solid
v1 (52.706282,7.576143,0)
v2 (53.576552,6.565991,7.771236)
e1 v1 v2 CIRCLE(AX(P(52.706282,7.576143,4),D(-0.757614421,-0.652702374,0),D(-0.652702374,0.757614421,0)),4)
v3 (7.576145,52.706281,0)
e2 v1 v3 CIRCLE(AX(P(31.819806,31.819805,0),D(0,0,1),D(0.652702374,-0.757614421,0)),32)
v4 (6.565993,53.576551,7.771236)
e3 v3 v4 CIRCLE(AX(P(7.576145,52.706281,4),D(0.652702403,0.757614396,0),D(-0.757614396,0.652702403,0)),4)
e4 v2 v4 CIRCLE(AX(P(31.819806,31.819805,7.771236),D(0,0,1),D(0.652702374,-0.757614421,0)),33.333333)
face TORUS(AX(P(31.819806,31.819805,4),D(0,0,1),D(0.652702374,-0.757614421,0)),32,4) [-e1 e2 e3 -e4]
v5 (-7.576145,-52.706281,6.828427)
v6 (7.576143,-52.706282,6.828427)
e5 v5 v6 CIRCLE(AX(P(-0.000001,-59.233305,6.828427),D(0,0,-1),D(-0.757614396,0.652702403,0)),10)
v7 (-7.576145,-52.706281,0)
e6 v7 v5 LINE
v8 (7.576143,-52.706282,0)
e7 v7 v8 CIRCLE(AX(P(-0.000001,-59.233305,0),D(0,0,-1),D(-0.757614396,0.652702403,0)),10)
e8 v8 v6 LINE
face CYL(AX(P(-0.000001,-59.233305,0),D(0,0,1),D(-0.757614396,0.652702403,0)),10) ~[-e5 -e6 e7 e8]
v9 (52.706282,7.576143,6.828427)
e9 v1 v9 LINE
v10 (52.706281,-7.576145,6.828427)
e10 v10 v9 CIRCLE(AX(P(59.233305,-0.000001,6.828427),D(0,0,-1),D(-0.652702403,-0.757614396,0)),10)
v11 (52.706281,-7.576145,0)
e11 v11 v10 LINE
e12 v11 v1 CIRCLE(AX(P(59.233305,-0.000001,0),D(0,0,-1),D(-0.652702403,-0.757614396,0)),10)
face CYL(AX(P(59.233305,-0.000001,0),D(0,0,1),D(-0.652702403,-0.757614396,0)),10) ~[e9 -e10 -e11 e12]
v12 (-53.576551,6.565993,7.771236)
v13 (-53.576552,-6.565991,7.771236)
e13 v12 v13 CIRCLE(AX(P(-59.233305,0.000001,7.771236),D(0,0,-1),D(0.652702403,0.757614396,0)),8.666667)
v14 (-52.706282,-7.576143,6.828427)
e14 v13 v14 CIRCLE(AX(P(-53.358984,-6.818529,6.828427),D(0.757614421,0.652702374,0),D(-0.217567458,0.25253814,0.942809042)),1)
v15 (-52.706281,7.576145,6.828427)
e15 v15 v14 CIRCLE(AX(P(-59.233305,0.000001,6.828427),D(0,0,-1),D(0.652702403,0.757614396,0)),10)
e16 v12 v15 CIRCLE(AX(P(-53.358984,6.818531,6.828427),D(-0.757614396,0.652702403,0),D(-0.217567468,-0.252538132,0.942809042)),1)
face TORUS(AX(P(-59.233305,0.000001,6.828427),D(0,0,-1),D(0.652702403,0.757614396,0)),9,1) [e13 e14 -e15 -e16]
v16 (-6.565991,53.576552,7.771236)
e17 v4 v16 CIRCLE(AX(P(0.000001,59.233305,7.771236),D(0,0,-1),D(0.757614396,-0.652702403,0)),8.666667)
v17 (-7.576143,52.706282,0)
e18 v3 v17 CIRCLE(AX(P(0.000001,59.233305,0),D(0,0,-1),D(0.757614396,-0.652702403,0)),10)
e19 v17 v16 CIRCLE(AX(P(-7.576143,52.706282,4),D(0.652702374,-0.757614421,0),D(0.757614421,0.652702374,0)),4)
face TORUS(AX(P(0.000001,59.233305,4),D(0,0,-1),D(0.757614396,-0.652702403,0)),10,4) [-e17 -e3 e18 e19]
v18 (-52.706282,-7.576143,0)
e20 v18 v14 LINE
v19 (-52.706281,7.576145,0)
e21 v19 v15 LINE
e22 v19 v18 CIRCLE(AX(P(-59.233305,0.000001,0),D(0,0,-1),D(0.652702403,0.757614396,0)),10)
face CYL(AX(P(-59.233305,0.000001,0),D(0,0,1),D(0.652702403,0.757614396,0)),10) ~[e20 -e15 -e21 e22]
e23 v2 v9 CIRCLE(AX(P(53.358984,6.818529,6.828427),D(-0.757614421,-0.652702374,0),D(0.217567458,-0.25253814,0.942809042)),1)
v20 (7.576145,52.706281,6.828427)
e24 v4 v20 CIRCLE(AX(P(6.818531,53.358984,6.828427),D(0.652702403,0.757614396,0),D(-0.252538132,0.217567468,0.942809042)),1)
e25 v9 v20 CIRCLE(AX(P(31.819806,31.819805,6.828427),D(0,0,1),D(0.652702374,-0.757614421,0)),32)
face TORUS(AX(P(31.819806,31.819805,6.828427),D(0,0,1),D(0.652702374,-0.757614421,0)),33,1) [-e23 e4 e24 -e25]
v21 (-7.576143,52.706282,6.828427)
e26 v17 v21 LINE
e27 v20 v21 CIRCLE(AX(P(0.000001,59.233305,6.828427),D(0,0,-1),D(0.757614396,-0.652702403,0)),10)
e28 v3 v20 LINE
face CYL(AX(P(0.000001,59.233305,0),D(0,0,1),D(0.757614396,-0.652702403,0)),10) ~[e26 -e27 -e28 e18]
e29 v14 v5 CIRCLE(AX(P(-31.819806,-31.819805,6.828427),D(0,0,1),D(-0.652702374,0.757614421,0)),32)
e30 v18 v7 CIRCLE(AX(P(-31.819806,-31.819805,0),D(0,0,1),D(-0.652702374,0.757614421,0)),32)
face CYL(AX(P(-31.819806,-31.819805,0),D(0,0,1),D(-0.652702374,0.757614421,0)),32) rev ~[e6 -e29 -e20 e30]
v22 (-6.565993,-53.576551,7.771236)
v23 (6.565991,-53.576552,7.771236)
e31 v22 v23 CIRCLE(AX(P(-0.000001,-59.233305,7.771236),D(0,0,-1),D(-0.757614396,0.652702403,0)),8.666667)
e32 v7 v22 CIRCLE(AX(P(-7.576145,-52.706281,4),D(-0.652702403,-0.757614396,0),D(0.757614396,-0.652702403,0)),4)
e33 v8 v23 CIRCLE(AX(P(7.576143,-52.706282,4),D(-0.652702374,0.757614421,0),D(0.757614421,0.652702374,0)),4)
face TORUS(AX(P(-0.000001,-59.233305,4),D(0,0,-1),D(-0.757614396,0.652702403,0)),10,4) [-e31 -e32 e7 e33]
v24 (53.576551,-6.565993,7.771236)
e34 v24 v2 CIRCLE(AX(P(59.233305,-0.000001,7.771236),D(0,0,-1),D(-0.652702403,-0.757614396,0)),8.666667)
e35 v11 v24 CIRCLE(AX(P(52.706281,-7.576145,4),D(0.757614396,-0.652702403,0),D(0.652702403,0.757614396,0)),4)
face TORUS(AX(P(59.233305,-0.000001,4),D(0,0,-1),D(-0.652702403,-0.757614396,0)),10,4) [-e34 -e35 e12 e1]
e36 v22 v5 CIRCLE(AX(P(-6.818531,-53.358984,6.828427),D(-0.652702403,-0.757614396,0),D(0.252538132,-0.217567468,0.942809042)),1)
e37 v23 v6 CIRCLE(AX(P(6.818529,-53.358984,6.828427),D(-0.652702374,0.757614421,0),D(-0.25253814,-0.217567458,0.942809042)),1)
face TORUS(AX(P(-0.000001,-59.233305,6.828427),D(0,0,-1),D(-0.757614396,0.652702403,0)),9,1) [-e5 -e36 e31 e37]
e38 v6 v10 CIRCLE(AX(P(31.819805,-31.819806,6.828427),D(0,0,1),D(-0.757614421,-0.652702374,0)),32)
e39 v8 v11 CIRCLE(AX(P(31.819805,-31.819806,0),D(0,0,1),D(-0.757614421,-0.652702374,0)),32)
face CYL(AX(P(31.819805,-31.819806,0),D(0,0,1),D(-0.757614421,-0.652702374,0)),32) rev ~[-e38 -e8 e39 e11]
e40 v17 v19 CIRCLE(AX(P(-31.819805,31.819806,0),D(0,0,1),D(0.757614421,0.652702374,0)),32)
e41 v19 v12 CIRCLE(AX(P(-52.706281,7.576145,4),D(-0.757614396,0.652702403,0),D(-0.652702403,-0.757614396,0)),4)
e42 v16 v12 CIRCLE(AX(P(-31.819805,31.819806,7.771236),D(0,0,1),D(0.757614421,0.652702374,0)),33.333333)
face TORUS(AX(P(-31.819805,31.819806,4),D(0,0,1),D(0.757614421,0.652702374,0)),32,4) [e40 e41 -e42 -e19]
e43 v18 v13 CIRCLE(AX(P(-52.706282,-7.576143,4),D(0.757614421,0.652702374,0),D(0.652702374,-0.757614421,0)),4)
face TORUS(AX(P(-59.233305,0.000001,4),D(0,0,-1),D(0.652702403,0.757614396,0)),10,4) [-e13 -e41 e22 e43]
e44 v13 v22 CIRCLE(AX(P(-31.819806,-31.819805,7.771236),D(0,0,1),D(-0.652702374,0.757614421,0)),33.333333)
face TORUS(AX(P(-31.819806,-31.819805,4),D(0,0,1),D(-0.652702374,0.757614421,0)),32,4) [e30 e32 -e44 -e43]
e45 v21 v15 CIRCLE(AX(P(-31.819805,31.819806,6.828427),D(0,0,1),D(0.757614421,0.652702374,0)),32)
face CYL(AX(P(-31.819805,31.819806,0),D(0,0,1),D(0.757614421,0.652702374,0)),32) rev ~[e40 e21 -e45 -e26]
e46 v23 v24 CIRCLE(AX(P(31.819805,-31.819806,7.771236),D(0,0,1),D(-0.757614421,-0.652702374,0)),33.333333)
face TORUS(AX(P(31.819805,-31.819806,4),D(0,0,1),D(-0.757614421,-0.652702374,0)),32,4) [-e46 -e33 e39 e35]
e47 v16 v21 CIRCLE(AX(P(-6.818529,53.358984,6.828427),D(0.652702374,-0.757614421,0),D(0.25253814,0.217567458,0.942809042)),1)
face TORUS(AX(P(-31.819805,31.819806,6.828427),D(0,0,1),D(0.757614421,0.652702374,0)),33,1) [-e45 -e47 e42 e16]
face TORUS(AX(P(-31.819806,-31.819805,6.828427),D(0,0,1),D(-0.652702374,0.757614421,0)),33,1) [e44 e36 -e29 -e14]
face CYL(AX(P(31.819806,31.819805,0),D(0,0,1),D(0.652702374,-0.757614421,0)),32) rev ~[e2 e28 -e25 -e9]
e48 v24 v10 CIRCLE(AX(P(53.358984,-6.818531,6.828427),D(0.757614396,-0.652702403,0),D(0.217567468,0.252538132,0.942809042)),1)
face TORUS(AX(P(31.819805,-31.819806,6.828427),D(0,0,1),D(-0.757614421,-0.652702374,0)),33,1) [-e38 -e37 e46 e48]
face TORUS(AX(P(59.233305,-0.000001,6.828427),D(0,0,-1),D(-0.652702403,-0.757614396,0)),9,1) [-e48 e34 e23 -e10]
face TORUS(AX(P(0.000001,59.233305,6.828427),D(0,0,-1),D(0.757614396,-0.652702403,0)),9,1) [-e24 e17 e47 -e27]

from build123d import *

# Parameters (mm, degrees)
F3_T3_ANGLE  = 98.5086767383
F3_T6_ANGLE  = 188.5086767383
F3_T9_ANGLE  = 98.5086767383
F3_T12_ANGLE = 188.5086767383
F3_T15_ANGLE = 98.5086767383
F3_T18_ANGLE = 188.5086767383
F3_T21_ANGLE = 98.5086767383
F3_T24_ANGLE = 188.5086767383


# Not quite as in the source:
# - a fillet or chamfer that OpenCascade refuses, or shapes differently, is made with other operations: its cross-section is extruded or revolved along the edge and cut away or added


with BuildPart() as f2:
    # F2: sweep along a path in F0
    with BuildLine(Plane.XY) as f2_path:
        ThreePointArc((-7.5761430926, 52.7062817331), (-54.4472211271, 54.4472231756), (-52.706281448, 7.5761450757))
        ThreePointArc((-52.706281448, 7.5761450757), (-49.2333054771, 9.262e-07), (-52.7062817331, -7.5761430926))
        ThreePointArc((-52.7062817331, -7.5761430926), (-54.4472231756, -54.4472211271), (-7.5761450757, -52.706281448))
        ThreePointArc((-7.5761450757, -52.706281448), (-9.262e-07, -49.2333054771), (7.5761430926, -52.7062817331))
        ThreePointArc((7.5761430926, -52.7062817331), (54.4472211271, -54.4472231756), (52.706281448, -7.5761450757))
        ThreePointArc((52.706281448, -7.5761450757), (49.2333054771, -9.262e-07), (52.7062817331, 7.5761430926))
        ThreePointArc((52.7062817331, 7.5761430926), (54.4472231756, 54.4472211271), (7.5761450757, 52.706281448))
        ThreePointArc((7.5761450757, 52.706281448), (9.262e-07, 49.2333054771), (-7.5761430926, 52.7062817331))
    # F1 (on Front) → F2 (sweep)
    with BuildSketch(Plane.XZ):
        with BuildLine():
            ThreePointArc((-49.2333054771, 8), (-53.2333054771, 4), (-49.2333054771, 0))
            Line((-49.2333054771, 0), (-49.2333054771, 8))
        make_face()
    sweep(path=f2_path.line)

    # F3: fillet of radius 1 on 8 edges, made by hand


with BuildPart() as f3_tool1:
    # F3_s2 → F3_t3 (revolve)
    with BuildSketch(Plane(origin=(29.2906767453, 33.9987079499, 0), x_dir=(0, 0, 1), z_dir=(0.6527024029, 0.7576143961, 0))):
        with BuildLine():
            ThreePointArc((7.7712361663, -29.9950533065), (7.6449237057, -29.084369704), (6.8284271247, -28.6617199732))
            Line((6.8284271247, -28.6617199732), (8, -28.6617199732))
            ThreePointArc((8, -28.6617199732), (7.9423942386, -29.3381278881), (7.7712361663, -29.9950533065))
        make_face()
    revolve(axis=Axis((1.1143e-06, 59.2333054771, 8), (0, 0, -1)), revolution_arc=F3_T3_ANGLE)


with BuildPart() as f3_tool4:
    # F3_s5 → F3_t6 (revolve)
    with BuildSketch(Plane(origin=(-29.2906754662, 33.9987090519, 0), x_dir=(0, 0, 1), z_dir=(0.6527023744, -0.7576144207, 0))):
        with BuildLine():
            ThreePointArc((7.7712361663, -29.9950533065), (7.6449237057, -29.084369704), (6.8284271247, -28.6617199732))
            Line((6.8284271247, -28.6617199732), (8, -28.6617199732))
            ThreePointArc((8, -28.6617199732), (7.9423942386, -29.3381278881), (7.7712361663, -29.9950533065))
        make_face()
    revolve(axis=Axis((-31.8198045548, 31.819805752, 8), (0, 0, 1)), revolution_arc=F3_T6_ANGLE)


with BuildPart() as f3_tool7:
    # F3_s8 → F3_t9 (revolve)
    with BuildSketch(Plane(origin=(-33.9987079499, 29.2906767453, 0), x_dir=(0, 0, 1), z_dir=(-0.7576143961, 0.6527024029, 0))):
        with BuildLine():
            ThreePointArc((7.7712361663, -29.9950533065), (7.6449237057, -29.084369704), (6.8284271247, -28.6617199732))
            Line((6.8284271247, -28.6617199732), (8, -28.6617199732))
            ThreePointArc((8, -28.6617199732), (7.9423942386, -29.3381278881), (7.7712361663, -29.9950533065))
        make_face()
    revolve(axis=Axis((-59.2333054771, 1.1143e-06, 8), (0, 0, -1)), revolution_arc=F3_T9_ANGLE)


with BuildPart() as f3_tool10:
    # F3_s11 → F3_t12 (revolve)
    with BuildSketch(Plane(origin=(-33.9987090519, -29.2906754662, 0), x_dir=(0, 0, 1), z_dir=(0.7576144207, 0.6527023744, 0))):
        with BuildLine():
            ThreePointArc((7.7712361663, -29.9950533065), (7.6449237057, -29.084369704), (6.8284271247, -28.6617199732))
            Line((6.8284271247, -28.6617199732), (8, -28.6617199732))
            ThreePointArc((8, -28.6617199732), (7.9423942386, -29.3381278881), (7.7712361663, -29.9950533065))
        make_face()
    revolve(axis=Axis((-31.819805752, -31.8198045548, 8), (0, 0, 1)), revolution_arc=F3_T12_ANGLE)


with BuildPart() as f3_tool13:
    # F3_s14 → F3_t15 (revolve)
    with BuildSketch(Plane(origin=(-29.2906767453, -33.9987079499, 0), x_dir=(0, 0, 1), z_dir=(-0.6527024029, -0.7576143961, 0))):
        with BuildLine():
            ThreePointArc((7.7712361663, -29.9950533065), (7.6449237057, -29.084369704), (6.8284271247, -28.6617199732))
            Line((6.8284271247, -28.6617199732), (8, -28.6617199732))
            ThreePointArc((8, -28.6617199732), (7.9423942386, -29.3381278881), (7.7712361663, -29.9950533065))
        make_face()
    revolve(axis=Axis((-1.1143e-06, -59.2333054771, 8), (0, 0, -1)), revolution_arc=F3_T15_ANGLE)


with BuildPart() as f3_tool16:
    # F3_s17 → F3_t18 (revolve)
    with BuildSketch(Plane(origin=(29.2906754662, -33.9987090519, 0), x_dir=(0, 0, 1), z_dir=(-0.6527023744, 0.7576144207, 0))):
        with BuildLine():
            ThreePointArc((7.7712361663, -29.9950533065), (7.6449237057, -29.084369704), (6.8284271247, -28.6617199732))
            Line((6.8284271247, -28.6617199732), (8, -28.6617199732))
            ThreePointArc((8, -28.6617199732), (7.9423942386, -29.3381278881), (7.7712361663, -29.9950533065))
        make_face()
    revolve(axis=Axis((31.8198045548, -31.819805752, 8), (0, 0, 1)), revolution_arc=F3_T18_ANGLE)


with BuildPart() as f3_tool19:
    # F3_s20 → F3_t21 (revolve)
    with BuildSketch(Plane(origin=(33.9987079499, -29.2906767453, 0), x_dir=(0, 0, 1), z_dir=(0.7576143961, -0.6527024029, 0))):
        with BuildLine():
            ThreePointArc((7.7712361663, -29.9950533065), (7.6449237057, -29.084369704), (6.8284271247, -28.6617199732))
            Line((6.8284271247, -28.6617199732), (8, -28.6617199732))
            ThreePointArc((8, -28.6617199732), (7.9423942386, -29.3381278881), (7.7712361663, -29.9950533065))
        make_face()
    revolve(axis=Axis((59.2333054771, -1.1143e-06, 8), (0, 0, -1)), revolution_arc=F3_T21_ANGLE)


with BuildPart() as f3_tool22:
    # F3_s23 → F3_t24 (revolve)
    with BuildSketch(Plane(origin=(33.9987090519, 29.2906754662, 0), x_dir=(0, 0, 1), z_dir=(-0.7576144207, -0.6527023744, 0))):
        with BuildLine():
            ThreePointArc((7.7712361663, -29.9950533065), (7.6449237057, -29.084369704), (6.8284271247, -28.6617199732))
            Line((6.8284271247, -28.6617199732), (8, -28.6617199732))
            ThreePointArc((8, -28.6617199732), (7.9423942386, -29.3381278881), (7.7712361663, -29.9950533065))
        make_face()
    revolve(axis=Axis((31.819805752, 31.8198045548, 8), (0, 0, 1)), revolution_arc=F3_T24_ANGLE)


with BuildPart() as f2_1:
    add(f2.part)

    # F3_t25: cut F3_tool1, F3_tool4, F3_tool7, F3_tool10, F3_tool13, F3_tool16, F3_tool19, F3_tool22
    add([f3_tool1.part, f3_tool4.part, f3_tool7.part, f3_tool10.part, f3_tool13.part, f3_tool16.part, f3_tool19.part, f3_tool22.part], mode=Mode.SUBTRACT)


solid = f2_1.part
